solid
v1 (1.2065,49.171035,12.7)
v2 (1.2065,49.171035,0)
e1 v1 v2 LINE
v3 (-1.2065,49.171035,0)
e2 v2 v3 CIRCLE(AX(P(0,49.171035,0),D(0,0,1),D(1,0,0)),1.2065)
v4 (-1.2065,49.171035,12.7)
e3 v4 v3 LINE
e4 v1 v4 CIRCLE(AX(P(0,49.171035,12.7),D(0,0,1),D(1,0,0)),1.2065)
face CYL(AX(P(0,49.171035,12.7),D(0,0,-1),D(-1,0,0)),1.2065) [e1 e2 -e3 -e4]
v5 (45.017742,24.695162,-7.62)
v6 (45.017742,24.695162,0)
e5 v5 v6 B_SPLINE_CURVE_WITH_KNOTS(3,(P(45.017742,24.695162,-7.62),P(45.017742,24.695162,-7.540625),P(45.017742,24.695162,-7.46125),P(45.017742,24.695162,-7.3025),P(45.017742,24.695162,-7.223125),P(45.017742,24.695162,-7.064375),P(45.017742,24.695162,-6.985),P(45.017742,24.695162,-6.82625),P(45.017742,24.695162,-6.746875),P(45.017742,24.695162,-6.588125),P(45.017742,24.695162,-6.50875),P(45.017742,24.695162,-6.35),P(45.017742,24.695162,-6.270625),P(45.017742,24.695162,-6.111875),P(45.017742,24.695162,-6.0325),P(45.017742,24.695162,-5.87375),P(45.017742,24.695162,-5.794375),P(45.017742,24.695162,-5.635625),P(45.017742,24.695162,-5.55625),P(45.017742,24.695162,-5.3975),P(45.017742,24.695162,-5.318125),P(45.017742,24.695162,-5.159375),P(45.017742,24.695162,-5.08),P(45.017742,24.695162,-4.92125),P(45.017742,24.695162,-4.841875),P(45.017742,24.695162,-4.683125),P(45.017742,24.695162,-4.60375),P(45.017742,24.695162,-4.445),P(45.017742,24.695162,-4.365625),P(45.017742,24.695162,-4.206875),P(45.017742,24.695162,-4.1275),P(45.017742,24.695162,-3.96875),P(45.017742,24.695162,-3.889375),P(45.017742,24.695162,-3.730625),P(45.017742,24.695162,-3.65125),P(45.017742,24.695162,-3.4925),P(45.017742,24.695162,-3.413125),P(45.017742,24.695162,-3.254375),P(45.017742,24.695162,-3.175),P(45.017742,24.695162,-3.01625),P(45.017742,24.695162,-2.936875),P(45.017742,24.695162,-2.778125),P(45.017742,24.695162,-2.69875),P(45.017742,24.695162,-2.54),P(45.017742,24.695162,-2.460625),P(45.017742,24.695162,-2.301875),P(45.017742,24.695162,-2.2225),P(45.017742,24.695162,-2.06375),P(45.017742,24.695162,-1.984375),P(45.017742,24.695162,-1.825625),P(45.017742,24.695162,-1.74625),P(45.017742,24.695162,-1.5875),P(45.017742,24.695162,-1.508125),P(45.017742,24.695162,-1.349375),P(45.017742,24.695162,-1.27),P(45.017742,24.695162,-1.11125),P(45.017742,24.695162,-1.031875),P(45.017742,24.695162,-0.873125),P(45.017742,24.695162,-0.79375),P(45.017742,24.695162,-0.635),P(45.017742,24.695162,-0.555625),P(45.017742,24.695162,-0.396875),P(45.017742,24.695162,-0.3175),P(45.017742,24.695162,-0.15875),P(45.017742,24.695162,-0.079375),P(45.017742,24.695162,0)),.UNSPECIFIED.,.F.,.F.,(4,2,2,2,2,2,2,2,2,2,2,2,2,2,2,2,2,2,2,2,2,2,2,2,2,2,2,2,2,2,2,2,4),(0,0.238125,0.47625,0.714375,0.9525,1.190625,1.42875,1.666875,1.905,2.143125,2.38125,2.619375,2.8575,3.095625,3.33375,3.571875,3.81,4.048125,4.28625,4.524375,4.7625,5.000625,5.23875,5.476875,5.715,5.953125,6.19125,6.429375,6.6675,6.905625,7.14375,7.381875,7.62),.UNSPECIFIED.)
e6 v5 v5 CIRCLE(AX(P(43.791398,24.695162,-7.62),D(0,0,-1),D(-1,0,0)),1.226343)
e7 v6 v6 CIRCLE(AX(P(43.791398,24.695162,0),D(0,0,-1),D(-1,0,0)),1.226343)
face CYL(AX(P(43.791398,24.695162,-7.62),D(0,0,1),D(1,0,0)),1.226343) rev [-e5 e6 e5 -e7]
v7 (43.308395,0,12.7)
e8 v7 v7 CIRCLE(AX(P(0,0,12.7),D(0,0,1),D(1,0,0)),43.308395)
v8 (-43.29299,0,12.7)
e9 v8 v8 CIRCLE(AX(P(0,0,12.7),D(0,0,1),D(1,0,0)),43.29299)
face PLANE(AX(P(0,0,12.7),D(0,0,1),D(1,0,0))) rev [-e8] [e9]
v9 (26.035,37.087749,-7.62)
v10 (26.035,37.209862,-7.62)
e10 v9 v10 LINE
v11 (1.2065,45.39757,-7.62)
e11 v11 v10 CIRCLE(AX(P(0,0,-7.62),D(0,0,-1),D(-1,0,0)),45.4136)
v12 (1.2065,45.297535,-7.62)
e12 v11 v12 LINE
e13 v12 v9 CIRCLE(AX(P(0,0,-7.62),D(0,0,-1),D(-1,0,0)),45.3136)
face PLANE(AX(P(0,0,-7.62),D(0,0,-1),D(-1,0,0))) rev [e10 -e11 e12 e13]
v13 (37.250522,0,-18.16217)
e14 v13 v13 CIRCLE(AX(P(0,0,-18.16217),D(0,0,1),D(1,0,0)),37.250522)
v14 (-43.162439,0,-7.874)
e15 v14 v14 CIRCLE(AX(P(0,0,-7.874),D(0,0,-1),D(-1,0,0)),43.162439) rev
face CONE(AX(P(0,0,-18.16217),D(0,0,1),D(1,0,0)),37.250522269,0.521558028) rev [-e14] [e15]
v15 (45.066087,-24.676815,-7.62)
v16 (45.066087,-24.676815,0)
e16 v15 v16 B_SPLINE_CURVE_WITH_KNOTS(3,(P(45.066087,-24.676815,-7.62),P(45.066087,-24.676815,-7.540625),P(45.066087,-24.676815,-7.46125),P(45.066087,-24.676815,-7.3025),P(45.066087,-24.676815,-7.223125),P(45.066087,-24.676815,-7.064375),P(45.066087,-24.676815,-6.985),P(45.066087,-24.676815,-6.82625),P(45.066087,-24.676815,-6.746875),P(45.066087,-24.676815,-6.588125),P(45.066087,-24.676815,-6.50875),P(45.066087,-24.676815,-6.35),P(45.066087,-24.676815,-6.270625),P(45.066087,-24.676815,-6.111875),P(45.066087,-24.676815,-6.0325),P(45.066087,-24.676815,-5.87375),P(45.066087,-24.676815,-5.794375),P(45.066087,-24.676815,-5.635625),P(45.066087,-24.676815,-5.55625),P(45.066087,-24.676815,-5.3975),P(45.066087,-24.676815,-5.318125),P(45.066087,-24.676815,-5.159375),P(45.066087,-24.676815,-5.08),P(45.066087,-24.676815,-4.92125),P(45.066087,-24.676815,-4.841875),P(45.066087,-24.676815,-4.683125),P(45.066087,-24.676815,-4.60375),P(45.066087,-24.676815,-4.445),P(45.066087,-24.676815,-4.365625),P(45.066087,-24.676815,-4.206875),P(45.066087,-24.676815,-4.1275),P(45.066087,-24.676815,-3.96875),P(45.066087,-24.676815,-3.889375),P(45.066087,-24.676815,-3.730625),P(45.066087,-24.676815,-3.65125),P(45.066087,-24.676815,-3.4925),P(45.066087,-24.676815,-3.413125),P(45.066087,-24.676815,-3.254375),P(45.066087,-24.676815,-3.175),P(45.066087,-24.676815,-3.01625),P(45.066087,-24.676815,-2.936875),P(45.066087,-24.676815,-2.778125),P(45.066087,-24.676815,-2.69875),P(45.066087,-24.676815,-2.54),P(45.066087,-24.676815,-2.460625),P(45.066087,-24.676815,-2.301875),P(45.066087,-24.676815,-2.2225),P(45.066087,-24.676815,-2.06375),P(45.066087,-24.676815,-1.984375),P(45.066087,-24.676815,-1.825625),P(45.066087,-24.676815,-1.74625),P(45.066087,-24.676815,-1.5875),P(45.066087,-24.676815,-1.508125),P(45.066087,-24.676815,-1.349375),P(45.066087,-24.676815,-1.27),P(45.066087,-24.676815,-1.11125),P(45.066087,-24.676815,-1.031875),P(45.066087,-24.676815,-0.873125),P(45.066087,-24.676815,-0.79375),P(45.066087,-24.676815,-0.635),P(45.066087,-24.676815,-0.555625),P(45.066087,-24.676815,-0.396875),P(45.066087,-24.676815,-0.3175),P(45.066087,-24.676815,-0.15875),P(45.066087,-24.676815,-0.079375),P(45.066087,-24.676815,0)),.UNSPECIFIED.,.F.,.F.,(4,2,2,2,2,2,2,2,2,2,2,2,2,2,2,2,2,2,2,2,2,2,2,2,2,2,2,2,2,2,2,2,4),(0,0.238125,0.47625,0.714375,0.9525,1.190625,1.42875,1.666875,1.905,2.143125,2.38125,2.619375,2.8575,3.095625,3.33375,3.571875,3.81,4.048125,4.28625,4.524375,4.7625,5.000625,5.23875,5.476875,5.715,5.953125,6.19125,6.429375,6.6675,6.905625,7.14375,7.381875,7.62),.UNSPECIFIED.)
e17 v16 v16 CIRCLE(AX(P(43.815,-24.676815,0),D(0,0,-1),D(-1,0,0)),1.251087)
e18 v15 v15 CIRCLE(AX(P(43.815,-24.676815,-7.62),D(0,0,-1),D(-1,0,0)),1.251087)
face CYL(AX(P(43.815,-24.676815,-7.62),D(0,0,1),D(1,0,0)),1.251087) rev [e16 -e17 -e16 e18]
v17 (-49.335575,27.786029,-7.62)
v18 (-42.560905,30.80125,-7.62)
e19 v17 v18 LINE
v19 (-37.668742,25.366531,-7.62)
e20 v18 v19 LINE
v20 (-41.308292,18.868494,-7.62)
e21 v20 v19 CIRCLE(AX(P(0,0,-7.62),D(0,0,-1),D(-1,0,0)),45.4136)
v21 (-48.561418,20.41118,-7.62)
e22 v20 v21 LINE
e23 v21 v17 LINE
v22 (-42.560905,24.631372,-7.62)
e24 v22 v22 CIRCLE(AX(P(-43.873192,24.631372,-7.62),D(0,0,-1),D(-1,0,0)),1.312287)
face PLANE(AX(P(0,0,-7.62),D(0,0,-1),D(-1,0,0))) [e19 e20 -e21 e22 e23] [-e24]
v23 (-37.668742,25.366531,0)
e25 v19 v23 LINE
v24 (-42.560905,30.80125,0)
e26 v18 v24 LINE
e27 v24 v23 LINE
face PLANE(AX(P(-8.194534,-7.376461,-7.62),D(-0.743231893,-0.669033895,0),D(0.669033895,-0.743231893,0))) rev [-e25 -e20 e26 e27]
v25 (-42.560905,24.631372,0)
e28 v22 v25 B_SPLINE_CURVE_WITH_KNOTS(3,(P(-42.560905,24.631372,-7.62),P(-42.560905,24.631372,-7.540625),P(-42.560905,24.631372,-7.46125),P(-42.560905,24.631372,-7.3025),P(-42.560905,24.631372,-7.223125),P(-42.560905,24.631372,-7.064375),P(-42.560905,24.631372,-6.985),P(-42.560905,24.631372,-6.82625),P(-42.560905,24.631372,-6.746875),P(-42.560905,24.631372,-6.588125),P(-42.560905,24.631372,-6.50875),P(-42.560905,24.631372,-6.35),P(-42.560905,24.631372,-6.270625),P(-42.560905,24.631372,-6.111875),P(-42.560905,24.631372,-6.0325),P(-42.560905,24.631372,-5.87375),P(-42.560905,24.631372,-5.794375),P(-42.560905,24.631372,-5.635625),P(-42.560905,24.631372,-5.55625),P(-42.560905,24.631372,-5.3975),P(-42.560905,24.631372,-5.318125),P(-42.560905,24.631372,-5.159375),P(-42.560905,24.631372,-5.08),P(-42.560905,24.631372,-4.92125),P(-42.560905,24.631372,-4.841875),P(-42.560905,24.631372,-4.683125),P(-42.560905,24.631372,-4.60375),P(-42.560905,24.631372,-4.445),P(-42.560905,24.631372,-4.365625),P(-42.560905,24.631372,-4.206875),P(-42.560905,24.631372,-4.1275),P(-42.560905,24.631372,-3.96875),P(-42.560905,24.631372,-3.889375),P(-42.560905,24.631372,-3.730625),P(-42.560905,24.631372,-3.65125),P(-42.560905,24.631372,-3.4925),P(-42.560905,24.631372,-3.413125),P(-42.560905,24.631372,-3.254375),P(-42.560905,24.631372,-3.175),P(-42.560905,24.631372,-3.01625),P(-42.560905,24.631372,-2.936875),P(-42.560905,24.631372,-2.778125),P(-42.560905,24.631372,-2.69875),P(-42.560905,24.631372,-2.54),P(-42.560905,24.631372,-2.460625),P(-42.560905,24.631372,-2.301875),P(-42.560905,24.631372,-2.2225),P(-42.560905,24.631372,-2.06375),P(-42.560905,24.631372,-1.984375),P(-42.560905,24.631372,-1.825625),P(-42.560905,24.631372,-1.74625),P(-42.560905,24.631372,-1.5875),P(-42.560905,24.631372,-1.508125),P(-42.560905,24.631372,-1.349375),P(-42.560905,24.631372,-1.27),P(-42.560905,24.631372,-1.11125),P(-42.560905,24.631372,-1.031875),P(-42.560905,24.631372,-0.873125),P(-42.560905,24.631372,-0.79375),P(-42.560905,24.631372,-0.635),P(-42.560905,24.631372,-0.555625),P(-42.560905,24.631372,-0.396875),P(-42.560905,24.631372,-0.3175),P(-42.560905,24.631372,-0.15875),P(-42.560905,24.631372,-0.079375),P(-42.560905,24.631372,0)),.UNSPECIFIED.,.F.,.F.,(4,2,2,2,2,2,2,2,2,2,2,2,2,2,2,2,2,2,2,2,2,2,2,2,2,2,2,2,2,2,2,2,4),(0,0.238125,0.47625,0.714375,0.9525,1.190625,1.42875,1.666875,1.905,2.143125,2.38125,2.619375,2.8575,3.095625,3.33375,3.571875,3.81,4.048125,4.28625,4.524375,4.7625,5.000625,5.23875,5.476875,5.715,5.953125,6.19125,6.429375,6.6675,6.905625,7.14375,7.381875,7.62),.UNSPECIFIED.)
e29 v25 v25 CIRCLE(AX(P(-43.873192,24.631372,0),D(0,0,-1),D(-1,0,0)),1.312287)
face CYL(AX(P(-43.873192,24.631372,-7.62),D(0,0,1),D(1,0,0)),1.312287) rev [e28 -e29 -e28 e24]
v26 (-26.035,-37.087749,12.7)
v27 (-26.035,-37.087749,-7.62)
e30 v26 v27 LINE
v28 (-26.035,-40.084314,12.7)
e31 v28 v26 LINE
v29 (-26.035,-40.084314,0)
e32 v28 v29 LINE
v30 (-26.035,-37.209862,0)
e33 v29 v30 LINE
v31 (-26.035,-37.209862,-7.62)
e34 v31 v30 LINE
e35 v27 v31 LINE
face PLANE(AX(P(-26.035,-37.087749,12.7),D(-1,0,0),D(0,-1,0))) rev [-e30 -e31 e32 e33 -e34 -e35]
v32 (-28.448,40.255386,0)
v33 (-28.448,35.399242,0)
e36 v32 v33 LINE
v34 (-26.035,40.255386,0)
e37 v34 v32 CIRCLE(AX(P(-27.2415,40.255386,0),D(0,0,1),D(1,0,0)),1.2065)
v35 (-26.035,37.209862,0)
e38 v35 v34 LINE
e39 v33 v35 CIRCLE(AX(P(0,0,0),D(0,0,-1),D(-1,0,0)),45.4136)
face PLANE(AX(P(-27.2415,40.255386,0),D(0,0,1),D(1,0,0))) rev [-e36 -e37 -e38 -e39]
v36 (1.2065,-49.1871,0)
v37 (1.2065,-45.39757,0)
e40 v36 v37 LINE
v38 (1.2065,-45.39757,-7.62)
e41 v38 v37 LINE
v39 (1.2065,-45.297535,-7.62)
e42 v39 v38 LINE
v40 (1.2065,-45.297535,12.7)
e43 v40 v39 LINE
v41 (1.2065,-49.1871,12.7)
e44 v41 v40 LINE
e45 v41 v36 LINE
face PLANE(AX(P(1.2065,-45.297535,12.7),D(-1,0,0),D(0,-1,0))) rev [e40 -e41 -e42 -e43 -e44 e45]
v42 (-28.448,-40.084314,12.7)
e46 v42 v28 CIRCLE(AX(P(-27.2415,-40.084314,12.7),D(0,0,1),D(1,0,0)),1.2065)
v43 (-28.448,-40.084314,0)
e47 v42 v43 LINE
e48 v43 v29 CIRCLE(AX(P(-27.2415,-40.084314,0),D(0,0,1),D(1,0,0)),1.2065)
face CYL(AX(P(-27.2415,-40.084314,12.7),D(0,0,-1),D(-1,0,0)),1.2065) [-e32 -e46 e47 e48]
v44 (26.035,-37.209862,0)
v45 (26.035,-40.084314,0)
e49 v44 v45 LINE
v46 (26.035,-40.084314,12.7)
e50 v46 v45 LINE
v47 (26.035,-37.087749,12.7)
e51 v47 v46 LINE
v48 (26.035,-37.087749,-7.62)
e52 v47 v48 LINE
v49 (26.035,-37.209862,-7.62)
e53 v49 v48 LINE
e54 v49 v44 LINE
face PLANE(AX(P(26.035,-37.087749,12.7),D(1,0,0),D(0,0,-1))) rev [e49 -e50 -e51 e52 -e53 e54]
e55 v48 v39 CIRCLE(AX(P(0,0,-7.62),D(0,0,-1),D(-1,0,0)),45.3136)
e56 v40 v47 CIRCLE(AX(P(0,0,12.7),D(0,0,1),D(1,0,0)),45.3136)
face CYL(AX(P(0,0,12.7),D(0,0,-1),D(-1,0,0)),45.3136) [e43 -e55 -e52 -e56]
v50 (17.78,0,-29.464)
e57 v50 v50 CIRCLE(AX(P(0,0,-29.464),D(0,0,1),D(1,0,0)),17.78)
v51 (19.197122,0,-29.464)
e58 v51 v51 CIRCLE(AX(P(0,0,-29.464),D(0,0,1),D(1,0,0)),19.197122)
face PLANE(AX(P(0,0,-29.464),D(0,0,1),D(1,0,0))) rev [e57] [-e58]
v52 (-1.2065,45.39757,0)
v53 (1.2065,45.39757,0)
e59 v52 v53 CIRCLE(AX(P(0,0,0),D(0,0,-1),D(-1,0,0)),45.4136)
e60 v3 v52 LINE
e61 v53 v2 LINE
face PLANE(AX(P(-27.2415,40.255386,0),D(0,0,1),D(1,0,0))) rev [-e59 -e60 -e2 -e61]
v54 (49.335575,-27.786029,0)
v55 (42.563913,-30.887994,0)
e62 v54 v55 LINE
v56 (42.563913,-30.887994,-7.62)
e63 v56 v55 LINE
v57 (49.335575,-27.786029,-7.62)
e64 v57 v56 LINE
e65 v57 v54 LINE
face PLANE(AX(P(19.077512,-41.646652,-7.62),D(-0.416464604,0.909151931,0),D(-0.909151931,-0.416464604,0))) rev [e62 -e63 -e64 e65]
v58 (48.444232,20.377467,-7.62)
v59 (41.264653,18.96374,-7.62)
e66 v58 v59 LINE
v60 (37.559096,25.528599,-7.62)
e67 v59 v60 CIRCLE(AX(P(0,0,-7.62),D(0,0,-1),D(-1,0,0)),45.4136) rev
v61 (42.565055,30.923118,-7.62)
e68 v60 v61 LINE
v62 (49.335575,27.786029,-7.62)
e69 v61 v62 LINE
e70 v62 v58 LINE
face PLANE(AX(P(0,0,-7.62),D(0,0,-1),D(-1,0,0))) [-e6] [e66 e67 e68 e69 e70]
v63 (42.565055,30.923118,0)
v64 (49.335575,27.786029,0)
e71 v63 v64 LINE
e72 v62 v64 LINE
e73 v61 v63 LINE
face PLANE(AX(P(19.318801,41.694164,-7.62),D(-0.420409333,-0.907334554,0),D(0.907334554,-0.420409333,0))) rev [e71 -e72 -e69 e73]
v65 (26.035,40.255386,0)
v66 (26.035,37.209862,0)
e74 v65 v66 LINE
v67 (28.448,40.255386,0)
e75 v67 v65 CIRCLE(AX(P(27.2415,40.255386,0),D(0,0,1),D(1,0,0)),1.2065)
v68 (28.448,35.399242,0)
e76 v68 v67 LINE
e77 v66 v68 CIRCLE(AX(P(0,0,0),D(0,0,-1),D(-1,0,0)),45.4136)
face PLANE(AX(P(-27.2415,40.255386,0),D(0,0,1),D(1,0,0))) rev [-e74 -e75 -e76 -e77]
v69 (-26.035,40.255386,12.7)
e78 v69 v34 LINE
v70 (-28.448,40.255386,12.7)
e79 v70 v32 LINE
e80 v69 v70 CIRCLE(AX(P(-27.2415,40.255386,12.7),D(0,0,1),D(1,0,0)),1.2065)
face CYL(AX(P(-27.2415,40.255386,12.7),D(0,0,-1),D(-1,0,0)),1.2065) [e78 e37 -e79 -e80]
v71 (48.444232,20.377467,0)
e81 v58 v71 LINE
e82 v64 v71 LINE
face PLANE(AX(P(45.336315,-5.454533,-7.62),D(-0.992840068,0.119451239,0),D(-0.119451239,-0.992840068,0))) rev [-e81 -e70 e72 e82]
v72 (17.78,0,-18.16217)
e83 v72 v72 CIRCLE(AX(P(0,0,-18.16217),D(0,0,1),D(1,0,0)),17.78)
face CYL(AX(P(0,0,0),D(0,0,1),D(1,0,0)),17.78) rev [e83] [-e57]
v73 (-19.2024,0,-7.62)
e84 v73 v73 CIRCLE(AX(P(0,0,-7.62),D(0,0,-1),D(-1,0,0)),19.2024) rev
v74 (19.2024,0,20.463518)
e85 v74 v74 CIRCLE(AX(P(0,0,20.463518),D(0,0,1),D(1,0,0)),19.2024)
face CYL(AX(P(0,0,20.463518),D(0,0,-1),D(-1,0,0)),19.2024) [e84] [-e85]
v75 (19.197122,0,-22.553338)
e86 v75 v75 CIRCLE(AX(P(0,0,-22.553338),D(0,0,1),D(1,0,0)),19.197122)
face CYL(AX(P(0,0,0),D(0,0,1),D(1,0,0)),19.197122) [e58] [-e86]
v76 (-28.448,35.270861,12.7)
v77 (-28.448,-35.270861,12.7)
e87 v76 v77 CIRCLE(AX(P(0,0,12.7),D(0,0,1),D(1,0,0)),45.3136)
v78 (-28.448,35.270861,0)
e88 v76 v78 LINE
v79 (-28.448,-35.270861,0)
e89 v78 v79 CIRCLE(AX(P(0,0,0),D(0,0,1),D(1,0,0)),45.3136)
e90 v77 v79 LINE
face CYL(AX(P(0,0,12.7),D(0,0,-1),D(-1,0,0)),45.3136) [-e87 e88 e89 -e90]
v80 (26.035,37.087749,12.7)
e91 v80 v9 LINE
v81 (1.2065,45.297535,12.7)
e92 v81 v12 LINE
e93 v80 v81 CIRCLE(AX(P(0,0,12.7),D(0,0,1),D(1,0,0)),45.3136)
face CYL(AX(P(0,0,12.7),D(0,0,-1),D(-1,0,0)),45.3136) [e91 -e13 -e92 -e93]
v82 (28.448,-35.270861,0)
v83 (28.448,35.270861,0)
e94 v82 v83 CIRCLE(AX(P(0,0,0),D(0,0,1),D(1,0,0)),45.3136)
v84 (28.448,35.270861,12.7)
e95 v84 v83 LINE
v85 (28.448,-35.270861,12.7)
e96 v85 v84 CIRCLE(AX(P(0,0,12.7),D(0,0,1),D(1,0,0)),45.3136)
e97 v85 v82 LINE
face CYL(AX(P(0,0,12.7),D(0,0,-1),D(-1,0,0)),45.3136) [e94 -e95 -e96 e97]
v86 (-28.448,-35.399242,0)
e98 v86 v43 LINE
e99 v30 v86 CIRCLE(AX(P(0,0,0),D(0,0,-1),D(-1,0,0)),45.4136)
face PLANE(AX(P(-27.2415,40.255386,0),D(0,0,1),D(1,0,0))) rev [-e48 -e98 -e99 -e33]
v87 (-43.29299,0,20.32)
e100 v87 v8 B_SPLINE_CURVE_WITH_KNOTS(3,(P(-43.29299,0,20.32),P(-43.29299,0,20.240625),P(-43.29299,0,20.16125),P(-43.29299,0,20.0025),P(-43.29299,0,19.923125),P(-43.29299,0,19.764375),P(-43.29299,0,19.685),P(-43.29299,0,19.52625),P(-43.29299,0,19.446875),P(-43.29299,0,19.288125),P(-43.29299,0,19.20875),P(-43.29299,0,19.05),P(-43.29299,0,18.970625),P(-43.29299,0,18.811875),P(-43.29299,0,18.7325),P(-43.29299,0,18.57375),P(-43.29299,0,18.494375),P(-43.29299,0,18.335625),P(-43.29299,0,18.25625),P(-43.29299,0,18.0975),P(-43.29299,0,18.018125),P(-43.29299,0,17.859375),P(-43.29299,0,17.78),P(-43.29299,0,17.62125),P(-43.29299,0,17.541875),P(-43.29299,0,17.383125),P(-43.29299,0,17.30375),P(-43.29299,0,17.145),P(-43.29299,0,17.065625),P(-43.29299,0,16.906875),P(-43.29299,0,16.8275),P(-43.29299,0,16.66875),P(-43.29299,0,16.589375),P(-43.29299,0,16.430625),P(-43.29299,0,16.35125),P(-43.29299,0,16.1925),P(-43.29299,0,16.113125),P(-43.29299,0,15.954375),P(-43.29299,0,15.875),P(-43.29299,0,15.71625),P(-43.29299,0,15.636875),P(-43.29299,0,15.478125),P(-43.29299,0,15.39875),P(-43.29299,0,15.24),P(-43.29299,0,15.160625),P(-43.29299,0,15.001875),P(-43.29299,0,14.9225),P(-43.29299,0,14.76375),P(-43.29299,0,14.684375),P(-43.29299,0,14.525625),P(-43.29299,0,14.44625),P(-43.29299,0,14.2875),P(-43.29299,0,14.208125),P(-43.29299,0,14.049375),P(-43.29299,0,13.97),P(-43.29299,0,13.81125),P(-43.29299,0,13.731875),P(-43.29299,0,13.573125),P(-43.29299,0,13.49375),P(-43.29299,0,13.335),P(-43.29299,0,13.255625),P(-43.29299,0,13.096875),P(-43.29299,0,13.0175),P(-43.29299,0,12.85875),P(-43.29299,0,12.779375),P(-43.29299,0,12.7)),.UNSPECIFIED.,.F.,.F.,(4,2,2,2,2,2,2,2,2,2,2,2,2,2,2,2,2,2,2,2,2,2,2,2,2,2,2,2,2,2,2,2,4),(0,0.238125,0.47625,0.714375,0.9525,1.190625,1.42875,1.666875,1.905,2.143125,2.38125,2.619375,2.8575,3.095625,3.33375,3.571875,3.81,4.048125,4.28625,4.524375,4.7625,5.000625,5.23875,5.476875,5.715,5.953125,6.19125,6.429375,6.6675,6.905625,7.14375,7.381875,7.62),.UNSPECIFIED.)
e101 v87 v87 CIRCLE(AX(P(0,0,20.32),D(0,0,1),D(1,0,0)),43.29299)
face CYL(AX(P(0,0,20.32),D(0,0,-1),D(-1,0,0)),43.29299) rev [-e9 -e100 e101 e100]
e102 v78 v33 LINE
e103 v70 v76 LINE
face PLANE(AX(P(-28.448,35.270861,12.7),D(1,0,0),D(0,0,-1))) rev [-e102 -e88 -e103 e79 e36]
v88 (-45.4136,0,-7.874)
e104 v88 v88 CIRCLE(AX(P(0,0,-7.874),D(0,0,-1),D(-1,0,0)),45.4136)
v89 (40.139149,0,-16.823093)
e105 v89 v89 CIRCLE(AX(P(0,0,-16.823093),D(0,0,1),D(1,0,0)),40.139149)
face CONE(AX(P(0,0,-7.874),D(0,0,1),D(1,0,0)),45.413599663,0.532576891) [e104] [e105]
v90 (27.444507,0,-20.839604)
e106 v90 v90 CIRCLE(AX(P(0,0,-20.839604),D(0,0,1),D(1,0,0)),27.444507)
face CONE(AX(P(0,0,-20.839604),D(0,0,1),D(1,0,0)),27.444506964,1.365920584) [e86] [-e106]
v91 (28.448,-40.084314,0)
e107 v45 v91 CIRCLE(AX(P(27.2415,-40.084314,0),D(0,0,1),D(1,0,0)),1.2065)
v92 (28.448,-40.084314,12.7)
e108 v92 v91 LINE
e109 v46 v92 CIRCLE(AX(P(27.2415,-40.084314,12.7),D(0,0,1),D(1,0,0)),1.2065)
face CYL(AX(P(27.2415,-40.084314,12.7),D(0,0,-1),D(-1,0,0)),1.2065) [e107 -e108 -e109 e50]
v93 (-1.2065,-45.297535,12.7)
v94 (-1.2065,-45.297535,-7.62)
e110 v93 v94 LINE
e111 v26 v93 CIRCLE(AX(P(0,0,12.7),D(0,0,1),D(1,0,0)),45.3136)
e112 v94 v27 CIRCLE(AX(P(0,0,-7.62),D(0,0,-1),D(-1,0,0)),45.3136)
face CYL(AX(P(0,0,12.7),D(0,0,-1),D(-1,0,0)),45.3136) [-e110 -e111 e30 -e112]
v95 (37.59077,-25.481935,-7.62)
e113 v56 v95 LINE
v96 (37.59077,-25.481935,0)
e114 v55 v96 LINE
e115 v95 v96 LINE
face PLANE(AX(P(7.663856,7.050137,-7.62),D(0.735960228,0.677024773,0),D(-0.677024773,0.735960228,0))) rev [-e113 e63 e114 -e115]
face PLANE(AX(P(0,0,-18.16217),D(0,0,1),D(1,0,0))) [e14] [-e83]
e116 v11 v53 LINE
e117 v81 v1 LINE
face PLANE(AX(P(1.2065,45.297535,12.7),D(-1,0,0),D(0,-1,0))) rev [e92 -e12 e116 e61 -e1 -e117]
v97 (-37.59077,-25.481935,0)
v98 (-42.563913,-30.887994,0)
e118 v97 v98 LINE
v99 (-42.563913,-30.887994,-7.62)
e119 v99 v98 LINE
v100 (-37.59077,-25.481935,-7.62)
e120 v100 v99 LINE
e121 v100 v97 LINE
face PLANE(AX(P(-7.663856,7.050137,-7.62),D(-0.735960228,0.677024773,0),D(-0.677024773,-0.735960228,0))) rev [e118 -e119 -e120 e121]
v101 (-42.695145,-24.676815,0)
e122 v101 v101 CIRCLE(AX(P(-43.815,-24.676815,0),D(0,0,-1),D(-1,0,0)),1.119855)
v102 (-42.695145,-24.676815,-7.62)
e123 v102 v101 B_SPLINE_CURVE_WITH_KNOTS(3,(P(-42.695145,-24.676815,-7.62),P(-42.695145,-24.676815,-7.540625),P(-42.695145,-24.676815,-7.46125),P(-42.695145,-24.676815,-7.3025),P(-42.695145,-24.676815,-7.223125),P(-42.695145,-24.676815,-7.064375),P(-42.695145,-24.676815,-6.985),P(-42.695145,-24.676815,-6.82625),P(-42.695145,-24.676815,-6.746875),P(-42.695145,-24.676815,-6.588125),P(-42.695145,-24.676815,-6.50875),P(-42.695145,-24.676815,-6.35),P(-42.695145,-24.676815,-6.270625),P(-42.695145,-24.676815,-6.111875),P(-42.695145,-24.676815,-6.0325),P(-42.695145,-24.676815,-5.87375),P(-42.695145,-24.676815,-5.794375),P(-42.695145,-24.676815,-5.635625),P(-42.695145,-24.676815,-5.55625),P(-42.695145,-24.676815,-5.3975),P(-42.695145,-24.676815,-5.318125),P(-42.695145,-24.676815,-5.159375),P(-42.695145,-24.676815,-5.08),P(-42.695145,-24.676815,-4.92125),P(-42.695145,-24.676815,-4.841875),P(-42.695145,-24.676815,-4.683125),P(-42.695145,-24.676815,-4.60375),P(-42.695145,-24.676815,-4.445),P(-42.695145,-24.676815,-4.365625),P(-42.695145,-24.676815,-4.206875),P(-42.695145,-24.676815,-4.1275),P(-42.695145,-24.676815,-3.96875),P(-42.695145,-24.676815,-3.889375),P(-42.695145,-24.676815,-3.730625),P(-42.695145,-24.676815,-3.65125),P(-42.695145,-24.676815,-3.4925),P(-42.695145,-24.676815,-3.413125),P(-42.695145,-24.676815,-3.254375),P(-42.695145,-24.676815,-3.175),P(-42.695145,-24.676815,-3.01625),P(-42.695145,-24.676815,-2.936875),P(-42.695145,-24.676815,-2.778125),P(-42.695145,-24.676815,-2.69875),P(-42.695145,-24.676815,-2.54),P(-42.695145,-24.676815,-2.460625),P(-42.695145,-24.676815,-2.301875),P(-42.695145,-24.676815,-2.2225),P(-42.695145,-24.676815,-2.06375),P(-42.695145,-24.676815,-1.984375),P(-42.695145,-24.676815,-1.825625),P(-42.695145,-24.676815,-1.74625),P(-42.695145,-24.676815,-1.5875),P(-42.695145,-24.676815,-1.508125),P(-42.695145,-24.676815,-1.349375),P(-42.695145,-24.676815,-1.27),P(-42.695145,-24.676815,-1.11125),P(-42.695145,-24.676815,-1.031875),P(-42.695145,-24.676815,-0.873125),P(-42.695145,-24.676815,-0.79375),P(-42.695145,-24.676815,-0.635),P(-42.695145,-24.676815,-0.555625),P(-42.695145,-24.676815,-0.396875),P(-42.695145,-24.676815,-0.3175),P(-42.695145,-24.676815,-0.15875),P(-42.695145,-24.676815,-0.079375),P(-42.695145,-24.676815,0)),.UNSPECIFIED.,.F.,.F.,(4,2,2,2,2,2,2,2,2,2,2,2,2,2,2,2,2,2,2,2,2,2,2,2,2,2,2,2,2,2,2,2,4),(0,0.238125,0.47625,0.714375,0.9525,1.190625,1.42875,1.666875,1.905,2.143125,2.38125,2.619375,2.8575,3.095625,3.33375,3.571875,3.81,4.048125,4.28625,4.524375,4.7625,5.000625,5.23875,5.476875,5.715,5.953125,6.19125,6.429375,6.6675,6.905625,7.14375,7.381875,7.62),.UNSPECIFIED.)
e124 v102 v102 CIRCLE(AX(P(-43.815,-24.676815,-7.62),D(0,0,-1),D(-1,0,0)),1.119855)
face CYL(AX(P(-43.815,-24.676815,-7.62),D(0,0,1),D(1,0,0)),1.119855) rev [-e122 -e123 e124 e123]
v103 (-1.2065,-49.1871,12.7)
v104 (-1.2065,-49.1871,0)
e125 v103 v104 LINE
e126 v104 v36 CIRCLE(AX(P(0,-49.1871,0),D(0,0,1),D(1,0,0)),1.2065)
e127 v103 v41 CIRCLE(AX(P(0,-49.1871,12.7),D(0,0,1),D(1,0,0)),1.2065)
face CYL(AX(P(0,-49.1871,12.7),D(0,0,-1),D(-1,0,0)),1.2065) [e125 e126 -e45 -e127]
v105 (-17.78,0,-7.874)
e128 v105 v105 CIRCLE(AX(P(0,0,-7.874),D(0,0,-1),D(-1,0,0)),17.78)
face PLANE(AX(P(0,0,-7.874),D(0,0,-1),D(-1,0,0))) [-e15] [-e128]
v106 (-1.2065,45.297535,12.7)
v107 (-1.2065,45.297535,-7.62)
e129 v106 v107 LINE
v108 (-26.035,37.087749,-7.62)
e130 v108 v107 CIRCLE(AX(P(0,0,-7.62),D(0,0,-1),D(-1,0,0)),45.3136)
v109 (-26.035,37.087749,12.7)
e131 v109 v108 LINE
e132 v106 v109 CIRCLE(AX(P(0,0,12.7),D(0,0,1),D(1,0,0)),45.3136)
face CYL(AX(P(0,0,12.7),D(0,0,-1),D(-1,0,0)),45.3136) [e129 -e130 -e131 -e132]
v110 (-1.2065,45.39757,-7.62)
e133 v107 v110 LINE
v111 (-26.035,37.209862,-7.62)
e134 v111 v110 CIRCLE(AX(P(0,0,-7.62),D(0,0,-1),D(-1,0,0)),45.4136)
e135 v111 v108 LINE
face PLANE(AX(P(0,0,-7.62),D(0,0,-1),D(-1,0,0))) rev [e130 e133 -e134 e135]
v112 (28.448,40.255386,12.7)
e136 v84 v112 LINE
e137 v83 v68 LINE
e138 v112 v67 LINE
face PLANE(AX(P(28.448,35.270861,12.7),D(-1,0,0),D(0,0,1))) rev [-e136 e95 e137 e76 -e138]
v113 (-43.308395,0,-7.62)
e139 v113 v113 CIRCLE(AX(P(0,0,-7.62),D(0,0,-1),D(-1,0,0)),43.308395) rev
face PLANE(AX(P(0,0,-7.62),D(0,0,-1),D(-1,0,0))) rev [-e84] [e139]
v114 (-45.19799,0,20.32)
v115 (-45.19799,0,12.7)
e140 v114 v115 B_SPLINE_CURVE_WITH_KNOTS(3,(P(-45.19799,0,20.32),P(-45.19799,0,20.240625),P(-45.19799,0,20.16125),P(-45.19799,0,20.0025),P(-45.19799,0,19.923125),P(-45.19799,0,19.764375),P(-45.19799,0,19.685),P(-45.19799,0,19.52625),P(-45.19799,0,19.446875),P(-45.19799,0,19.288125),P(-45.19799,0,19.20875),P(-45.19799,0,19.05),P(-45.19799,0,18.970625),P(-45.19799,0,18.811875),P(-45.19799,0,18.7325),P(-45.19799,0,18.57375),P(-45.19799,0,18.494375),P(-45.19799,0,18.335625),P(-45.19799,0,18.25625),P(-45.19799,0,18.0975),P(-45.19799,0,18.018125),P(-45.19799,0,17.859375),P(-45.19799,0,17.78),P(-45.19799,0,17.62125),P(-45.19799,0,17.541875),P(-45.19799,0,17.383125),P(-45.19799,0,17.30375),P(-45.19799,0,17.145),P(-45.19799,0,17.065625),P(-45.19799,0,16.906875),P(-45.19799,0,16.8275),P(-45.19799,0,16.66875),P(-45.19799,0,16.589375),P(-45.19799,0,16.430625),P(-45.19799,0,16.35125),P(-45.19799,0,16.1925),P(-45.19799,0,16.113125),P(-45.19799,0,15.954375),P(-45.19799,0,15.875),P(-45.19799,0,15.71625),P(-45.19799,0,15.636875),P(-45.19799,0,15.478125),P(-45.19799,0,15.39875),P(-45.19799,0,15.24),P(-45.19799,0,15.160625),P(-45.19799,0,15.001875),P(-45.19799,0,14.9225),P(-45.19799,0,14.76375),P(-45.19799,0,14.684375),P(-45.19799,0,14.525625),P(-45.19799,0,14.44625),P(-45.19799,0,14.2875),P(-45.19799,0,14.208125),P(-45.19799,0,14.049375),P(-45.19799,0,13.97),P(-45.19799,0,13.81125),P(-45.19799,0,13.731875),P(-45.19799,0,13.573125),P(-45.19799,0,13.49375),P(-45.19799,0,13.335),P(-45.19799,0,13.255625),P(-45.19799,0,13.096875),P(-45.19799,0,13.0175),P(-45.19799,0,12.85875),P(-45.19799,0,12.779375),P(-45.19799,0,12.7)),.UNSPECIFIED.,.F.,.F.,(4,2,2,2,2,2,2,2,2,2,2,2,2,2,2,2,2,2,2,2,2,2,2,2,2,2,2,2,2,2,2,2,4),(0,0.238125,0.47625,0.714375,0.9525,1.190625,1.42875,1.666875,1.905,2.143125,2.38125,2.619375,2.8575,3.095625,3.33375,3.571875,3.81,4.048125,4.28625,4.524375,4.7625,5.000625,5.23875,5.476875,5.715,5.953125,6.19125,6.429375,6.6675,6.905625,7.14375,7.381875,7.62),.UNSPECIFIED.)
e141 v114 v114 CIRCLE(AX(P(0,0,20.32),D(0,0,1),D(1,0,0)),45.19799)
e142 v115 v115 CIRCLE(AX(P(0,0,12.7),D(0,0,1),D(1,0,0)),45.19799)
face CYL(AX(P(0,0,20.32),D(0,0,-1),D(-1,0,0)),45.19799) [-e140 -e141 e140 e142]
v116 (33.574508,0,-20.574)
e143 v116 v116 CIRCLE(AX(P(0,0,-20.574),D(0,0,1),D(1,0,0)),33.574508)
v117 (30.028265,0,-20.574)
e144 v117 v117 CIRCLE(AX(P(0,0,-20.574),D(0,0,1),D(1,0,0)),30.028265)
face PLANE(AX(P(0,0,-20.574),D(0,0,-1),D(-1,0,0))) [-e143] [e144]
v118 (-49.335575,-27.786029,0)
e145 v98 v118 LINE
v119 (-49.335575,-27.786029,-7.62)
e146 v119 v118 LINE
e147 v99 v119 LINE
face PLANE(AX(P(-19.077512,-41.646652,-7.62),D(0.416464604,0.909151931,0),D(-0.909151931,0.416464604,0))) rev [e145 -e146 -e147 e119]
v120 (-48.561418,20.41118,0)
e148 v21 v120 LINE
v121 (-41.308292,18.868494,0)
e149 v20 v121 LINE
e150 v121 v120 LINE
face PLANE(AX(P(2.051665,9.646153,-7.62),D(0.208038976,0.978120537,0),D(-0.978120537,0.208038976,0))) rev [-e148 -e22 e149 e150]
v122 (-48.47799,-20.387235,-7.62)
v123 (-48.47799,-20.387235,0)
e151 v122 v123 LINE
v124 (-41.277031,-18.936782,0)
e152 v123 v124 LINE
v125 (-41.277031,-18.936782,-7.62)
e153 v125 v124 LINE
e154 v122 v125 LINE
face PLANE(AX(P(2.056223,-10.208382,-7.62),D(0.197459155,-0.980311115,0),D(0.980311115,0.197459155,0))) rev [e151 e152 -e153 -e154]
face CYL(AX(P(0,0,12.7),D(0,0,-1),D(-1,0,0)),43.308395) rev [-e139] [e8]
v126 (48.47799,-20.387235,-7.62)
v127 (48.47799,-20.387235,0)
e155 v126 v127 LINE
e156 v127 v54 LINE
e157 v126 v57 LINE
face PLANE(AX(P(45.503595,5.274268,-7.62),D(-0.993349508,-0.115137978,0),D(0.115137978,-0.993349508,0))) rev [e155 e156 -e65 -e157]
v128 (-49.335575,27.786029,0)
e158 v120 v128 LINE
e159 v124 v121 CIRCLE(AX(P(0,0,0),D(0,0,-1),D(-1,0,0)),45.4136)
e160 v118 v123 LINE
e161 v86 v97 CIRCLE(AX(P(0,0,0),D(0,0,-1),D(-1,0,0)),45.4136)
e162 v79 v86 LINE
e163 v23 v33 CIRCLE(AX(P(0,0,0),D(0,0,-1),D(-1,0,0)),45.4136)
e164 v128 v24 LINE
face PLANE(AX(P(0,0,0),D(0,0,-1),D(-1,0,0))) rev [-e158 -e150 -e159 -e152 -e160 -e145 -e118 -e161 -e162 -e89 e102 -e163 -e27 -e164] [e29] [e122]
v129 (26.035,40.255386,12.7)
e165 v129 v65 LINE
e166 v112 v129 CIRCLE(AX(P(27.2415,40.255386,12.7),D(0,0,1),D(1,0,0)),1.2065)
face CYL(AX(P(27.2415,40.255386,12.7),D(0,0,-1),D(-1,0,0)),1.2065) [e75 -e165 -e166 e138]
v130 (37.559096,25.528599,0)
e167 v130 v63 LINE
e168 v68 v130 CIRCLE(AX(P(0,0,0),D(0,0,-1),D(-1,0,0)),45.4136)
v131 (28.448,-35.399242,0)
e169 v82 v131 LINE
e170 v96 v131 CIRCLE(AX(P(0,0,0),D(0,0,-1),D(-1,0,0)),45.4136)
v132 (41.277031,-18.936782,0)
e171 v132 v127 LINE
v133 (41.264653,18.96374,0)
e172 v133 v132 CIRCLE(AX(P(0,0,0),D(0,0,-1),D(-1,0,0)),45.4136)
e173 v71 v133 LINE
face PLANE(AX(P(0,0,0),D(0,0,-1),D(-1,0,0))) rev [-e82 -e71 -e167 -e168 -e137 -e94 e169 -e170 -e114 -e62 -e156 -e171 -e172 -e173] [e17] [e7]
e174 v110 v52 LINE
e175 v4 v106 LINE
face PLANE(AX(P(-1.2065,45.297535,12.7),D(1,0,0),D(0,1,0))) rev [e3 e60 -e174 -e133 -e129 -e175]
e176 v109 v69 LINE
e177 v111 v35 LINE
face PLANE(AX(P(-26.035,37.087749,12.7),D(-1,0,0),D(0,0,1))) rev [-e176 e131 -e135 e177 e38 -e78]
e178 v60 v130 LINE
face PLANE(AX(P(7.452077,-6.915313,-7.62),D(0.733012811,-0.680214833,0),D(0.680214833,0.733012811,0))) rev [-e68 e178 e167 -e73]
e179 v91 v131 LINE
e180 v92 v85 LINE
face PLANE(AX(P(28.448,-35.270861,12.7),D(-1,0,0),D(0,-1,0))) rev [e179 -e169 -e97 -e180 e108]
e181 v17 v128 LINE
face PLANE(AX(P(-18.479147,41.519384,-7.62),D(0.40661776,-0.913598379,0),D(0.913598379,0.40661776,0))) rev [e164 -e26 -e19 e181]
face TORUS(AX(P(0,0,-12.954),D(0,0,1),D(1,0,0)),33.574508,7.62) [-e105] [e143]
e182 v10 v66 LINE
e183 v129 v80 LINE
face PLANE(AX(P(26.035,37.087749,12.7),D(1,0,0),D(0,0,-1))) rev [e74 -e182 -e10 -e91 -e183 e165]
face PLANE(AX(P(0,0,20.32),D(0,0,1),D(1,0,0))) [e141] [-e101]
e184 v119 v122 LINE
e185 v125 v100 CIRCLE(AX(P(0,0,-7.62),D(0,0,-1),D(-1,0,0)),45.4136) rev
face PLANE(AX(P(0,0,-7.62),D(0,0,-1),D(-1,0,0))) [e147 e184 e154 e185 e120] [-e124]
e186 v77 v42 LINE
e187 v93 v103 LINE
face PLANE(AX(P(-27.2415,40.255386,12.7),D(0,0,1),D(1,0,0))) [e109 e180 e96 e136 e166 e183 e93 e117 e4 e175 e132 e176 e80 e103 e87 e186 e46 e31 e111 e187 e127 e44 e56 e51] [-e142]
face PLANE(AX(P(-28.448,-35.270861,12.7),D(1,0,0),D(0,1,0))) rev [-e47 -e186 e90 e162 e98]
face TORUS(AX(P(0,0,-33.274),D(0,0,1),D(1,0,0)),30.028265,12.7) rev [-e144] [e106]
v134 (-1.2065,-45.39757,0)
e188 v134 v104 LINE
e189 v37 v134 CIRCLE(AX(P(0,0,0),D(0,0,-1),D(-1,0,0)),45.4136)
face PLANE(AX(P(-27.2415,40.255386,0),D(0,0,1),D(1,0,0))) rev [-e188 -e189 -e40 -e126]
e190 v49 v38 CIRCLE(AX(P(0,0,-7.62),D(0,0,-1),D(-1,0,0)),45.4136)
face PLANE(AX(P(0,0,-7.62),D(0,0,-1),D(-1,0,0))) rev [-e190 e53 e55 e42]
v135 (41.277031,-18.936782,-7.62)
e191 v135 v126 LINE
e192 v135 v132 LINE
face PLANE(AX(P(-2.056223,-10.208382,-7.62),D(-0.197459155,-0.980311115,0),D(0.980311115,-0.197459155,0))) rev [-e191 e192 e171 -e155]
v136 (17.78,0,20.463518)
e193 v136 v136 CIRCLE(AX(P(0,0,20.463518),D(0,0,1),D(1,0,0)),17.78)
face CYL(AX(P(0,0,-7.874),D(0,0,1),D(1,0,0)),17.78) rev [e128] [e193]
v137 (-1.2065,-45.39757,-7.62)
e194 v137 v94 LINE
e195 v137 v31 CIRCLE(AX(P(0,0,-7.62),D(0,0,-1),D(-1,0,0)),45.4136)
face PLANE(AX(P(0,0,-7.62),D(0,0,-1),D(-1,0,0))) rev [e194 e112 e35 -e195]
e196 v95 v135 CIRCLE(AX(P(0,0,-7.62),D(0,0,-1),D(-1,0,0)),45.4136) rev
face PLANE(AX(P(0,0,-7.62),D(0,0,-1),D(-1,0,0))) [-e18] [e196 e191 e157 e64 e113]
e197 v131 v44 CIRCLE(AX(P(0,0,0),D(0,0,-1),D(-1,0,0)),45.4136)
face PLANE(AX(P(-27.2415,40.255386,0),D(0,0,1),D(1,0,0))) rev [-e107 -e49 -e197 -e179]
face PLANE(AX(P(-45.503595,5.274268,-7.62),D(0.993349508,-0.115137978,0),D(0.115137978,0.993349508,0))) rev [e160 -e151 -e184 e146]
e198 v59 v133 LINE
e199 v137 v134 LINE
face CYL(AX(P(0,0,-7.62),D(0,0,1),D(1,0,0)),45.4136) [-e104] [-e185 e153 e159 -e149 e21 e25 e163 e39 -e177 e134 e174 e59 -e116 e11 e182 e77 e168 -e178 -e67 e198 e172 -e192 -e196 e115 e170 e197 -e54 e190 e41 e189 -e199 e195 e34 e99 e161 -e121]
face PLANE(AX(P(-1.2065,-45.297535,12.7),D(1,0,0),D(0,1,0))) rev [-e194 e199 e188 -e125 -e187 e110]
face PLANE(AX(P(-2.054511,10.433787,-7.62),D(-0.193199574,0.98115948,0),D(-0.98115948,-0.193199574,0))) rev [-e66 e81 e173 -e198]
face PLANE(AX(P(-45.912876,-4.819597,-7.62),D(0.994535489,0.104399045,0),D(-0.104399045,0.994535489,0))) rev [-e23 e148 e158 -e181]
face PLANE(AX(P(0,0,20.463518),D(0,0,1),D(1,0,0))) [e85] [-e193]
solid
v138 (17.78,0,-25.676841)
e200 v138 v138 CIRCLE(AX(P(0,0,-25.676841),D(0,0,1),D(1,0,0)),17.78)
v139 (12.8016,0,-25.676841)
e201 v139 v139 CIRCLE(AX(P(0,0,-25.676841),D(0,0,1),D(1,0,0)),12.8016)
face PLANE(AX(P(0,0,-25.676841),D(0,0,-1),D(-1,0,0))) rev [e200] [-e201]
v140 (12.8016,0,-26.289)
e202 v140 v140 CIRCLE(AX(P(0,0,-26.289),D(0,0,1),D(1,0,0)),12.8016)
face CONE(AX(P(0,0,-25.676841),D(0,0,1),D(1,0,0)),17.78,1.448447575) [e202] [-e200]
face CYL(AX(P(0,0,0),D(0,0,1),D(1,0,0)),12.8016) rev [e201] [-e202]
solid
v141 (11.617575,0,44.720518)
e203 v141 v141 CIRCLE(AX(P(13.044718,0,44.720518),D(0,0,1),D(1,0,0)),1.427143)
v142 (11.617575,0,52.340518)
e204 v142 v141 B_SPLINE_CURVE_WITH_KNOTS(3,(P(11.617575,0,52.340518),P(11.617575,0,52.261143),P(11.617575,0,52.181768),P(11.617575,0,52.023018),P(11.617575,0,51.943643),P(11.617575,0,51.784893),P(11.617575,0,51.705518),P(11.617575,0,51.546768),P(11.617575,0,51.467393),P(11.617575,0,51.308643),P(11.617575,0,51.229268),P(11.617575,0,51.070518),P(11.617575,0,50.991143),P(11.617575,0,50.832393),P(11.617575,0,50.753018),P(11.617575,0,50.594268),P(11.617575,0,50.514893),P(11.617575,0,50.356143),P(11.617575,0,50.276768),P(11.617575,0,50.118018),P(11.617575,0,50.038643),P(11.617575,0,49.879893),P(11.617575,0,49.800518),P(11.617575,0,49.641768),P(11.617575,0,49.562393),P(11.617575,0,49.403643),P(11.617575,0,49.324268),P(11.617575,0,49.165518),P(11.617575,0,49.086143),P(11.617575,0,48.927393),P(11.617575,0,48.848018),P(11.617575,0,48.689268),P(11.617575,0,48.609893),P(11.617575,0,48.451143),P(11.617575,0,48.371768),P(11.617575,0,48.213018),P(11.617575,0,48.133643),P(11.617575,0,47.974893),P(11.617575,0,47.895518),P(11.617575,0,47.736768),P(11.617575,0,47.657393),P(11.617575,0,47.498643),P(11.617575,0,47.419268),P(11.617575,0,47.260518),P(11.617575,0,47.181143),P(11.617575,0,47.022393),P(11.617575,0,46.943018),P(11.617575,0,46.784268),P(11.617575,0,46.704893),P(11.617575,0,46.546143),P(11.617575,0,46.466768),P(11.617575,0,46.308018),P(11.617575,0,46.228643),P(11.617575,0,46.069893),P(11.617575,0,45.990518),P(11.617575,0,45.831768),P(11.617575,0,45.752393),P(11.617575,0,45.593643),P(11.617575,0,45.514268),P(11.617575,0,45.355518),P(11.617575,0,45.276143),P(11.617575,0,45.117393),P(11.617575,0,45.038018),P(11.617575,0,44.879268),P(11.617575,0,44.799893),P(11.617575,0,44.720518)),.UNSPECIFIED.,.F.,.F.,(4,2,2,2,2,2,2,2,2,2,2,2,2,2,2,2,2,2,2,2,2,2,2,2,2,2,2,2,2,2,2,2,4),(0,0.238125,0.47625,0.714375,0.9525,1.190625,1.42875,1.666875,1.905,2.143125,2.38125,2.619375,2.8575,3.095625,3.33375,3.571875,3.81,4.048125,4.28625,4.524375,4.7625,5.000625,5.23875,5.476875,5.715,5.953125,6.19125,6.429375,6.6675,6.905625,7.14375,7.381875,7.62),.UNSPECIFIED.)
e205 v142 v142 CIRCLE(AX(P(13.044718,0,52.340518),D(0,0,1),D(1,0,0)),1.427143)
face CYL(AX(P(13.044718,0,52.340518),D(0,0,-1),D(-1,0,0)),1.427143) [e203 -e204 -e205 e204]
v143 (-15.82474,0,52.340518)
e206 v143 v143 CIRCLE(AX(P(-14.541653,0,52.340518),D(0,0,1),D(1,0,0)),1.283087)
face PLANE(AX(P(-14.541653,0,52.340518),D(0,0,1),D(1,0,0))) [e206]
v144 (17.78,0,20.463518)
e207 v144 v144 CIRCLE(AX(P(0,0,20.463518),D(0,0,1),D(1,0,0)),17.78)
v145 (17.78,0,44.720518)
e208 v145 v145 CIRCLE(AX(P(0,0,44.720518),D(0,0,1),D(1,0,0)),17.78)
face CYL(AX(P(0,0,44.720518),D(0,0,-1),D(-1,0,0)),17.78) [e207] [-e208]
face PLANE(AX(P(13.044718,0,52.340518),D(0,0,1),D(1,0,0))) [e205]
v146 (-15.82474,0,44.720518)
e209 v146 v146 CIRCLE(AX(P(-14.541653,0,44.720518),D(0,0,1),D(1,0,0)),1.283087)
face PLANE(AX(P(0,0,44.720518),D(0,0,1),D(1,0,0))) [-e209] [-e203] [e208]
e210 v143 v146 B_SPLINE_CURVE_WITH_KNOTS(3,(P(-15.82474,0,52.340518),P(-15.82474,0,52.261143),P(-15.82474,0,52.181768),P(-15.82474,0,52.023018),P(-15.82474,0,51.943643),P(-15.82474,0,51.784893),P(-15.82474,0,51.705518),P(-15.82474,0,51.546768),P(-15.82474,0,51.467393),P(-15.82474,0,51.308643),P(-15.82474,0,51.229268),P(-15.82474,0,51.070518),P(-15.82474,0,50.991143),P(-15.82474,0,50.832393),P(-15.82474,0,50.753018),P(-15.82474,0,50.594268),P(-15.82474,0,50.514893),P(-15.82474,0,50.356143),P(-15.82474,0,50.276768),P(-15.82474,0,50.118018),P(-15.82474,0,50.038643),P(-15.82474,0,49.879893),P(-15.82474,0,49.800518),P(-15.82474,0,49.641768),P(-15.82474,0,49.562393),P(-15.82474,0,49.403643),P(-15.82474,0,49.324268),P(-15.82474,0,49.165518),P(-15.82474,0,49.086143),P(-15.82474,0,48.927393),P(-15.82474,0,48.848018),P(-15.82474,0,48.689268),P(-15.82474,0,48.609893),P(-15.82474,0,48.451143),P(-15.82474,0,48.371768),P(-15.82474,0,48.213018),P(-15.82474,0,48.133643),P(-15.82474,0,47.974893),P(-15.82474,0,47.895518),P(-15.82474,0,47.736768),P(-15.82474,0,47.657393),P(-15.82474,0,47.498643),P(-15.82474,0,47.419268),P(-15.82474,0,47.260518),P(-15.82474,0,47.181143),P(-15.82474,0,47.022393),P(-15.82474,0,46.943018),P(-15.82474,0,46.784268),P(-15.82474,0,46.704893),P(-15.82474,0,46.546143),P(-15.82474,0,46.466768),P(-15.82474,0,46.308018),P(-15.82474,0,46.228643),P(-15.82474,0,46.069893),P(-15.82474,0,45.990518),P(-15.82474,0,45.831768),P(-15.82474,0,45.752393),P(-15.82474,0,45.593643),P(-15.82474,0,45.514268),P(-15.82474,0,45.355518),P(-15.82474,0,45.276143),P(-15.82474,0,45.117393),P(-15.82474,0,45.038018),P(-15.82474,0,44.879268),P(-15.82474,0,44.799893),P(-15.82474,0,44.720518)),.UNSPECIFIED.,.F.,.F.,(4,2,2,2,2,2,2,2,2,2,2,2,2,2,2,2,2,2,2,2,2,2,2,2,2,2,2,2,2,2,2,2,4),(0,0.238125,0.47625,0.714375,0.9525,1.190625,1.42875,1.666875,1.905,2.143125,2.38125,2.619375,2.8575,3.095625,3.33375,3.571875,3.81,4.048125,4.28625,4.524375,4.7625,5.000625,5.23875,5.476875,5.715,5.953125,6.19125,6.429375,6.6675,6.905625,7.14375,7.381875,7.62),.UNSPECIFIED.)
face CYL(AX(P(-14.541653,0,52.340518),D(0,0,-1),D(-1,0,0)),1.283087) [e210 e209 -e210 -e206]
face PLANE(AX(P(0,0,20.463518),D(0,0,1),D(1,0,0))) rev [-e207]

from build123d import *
from build123d.topology import SkipClean

# Parameters (mm, degrees)
SKETCH3_R                 = 43.308395252
BOSS_EXTRUDE1_DEPTH       = 12.7
SKETCH4_R                 = 45.197989656
SKETCH4_R_2               = 43.292989656
BOSS_EXTRUDE2_DEPTH       = 7.62
BOSS_EXTRUDE3_OUTLINE_R   = 1.251086703
BOSS_EXTRUDE3_OUTLINE_R_2 = 1.119854884
BOSS_EXTRUDE3_OUTLINE_R_3 = 1.226343403
BOSS_EXTRUDE3_OUTLINE_R_4 = 43.308395252
BOSS_EXTRUDE3_OUTLINE_R_5 = 1.312287122
BOSS_EXTRUDE3_DEPTH       = 7.62
SKETCH8_R                 = 45.413599663
SKETCH8_R_2               = 17.78
BOSS_EXTRUDE4_DEPTH       = 0.254
BOSS_EXTRUDE5_START       = 28.08351791
SKETCH11_R                = 19.2024
SKETCH11_R_2              = 17.78
BOSS_EXTRUDE5_DEPTH       = 28.08351791
SKETCH14_R                = 17.78
BOSS_EXTRUDE6_DEPTH       = 24.257
SKETCH15_R                = 1.28308703
SKETCH15_R_2              = 1.42714276
BOSS_EXTRUDE7_DEPTH       = 7.62


# Read off the part's stored shape, not the designer's step: Boss-Extrude3
with BuildPart() as part:
    # Sketch3 → Boss-Extrude1 (new body)
    with BuildSketch(Plane.XY):
        with BuildLine():
            Line((-26.035, 37.08774892), (-26.035, 40.255386447))
            ThreePointArc((-26.035, 40.255386447), (-27.2415, 41.461886447), (-28.448, 40.255386447))
            Line((-28.448, 40.255386447), (-28.448, 35.270861075))
            ThreePointArc((-28.448, 35.270861075), (-45.3136, 0), (-28.448, -35.270861075))
            Line((-28.448, -35.270861075), (-28.448, -40.084313616))
            ThreePointArc((-28.448, -40.084313616), (-27.2415, -41.290813616), (-26.035, -40.084313616))
            Line((-26.035, -40.084313616), (-26.035, -37.08774892))
            ThreePointArc((-26.035, -37.08774892), (-14.225855988, -43.022637836), (-1.2065, -45.297535283))
            Line((-1.2065, -45.297535283), (-1.2065, -49.1871))
            ThreePointArc((-1.2065, -49.1871), (0, -50.3936), (1.2065, -49.1871))
            Line((1.2065, -49.1871), (1.2065, -45.297535283))
            ThreePointArc((1.2065, -45.297535283), (14.225855988, -43.022637836), (26.035, -37.08774892))
            Line((26.035, -37.08774892), (26.035, -40.084313616))
            ThreePointArc((26.035, -40.084313616), (27.2415, -41.290813616), (28.448, -40.084313616))
            Line((28.448, -40.084313616), (28.448, -35.270861075))
            ThreePointArc((28.448, -35.270861075), (45.3136, 0), (28.448, 35.270861075))
            Line((28.448, 35.270861075), (28.448, 40.255386447))
            ThreePointArc((28.448, 40.255386447), (27.2415, 41.461886447), (26.035, 40.255386447))
            Line((26.035, 40.255386447), (26.035, 37.08774892))
            ThreePointArc((26.035, 37.08774892), (14.225855988, 43.022637836), (1.2065, 45.297535283))
            Line((1.2065, 45.297535283), (1.2065, 49.171035283))
            ThreePointArc((1.2065, 49.171035283), (0, 50.377535283), (-1.2065, 49.171035283))
            Line((-1.2065, 49.171035283), (-1.2065, 45.297535283))
            ThreePointArc((-1.2065, 45.297535283), (-14.225855988, 43.022637836), (-26.035, 37.08774892))
        make_face()
        Circle(SKETCH3_R, mode=Mode.SUBTRACT)
    extrude(amount=BOSS_EXTRUDE1_DEPTH)

    # Sketch4 → Boss-Extrude2 (add)
    with BuildSketch(Plane.XY.offset(12.7)):
        with Locations(Location((0, 0, 0), (0, 0, 180))):
            Circle(SKETCH4_R)
        with Locations(Location((0, 0, 0), (0, 0, 180))):
            Circle(SKETCH4_R_2, mode=Mode.SUBTRACT)
    extrude(amount=BOSS_EXTRUDE2_DEPTH)

    # Boss-Extrude3 outline → Boss-Extrude3 (add)
    with BuildSketch(Plane(origin=(0, 0, 0), x_dir=(-1, 0, 0), z_dir=(0, 0, -1))):
        with BuildLine():
            Line((1.2065, -45.397570332), (1.2065, -45.297535283))
            ThreePointArc((1.2065, -45.297535283), (14.225855988, -43.022637836), (26.035, -37.08774892))
            Line((26.035, -37.08774892), (26.035, -37.209861721))
            ThreePointArc((26.035, -37.209861721), (32.348813344, -31.873959741), (37.590770255, -25.481935287))
            Line((37.590770255, -25.481935287), (42.563913297, -30.887993729))
            Line((42.563913297, -30.887993729), (49.335575426, -27.786028599))
            Line((49.335575426, -27.786028599), (48.477989954, -20.387235264))
            Line((48.477989954, -20.387235264), (41.277031293, -18.936782249))
            ThreePointArc((41.277031293, -18.936782249), (45.413584137, -0.037551817), (41.308291914, 18.868493674))
            Line((41.308291914, 18.868493674), (48.561417854, 20.411179708))
            Line((48.561417854, 20.411179708), (49.335575426, 27.786028599))
            Line((49.335575426, 27.786028599), (42.560905178, 30.801249841))
            Line((42.560905178, 30.801249841), (37.668742456, 25.366530628))
            ThreePointArc((37.668742456, 25.366530628), (32.397651513, 31.824317915), (26.035, 37.209861721))
            Line((26.035, 37.209861721), (26.035, 37.08774892))
            ThreePointArc((26.035, 37.08774892), (14.225855988, 43.022637836), (1.2065, 45.297535283))
            Line((1.2065, 45.297535283), (1.2065, 45.397570332))
            ThreePointArc((1.2065, 45.397570332), (0, 45.413599663), (-1.2065, 45.397570332))
            Line((-1.2065, 45.397570332), (-1.2065, 45.297535283))
            ThreePointArc((-1.2065, 45.297535283), (-14.225855988, 43.022637836), (-26.035, 37.08774892))
            Line((-26.035, 37.08774892), (-26.035, 37.209861721))
            ThreePointArc((-26.035, 37.209861721), (-32.32901523, 31.89404033), (-37.55909567, 25.528598997))
            Line((-37.55909567, 25.528598997), (-42.565054803, 30.923118495))
            Line((-42.565054803, 30.923118495), (-49.335575426, 27.786028599))
            Line((-49.335575426, 27.786028599), (-48.444231571, 20.377466752))
            Line((-48.444231571, 20.377466752), (-41.264653189, 18.963739915))
            ThreePointArc((-41.264653189, 18.963739915), (-45.413597241, 0.014831834), (-41.277031293, -18.936782249))
            Line((-41.277031293, -18.936782249), (-48.477989954, -20.387235264))
            Line((-48.477989954, -20.387235264), (-49.335575426, -27.786028599))
            Line((-49.335575426, -27.786028599), (-42.563913297, -30.887993729))
            Line((-42.563913297, -30.887993729), (-37.590770255, -25.481935287))
            ThreePointArc((-37.590770255, -25.481935287), (-32.348813344, -31.873959741), (-26.035, -37.209861721))
            Line((-26.035, -37.209861721), (-26.035, -37.08774892))
            ThreePointArc((-26.035, -37.08774892), (-14.225855988, -43.022637836), (-1.2065, -45.297535283))
            Line((-1.2065, -45.297535283), (-1.2065, -45.397570332))
            ThreePointArc((-1.2065, -45.397570332), (0, -45.413599663), (1.2065, -45.397570332))
        make_face()
        with Locations((-43.815, -24.676814501)):
            Circle(BOSS_EXTRUDE3_OUTLINE_R, mode=Mode.SUBTRACT)
        with Locations((43.815, -24.676814501)):
            Circle(BOSS_EXTRUDE3_OUTLINE_R_2, mode=Mode.SUBTRACT)
        with Locations((-43.791398207, 24.695162459)):
            Circle(BOSS_EXTRUDE3_OUTLINE_R_3, mode=Mode.SUBTRACT)
        Circle(BOSS_EXTRUDE3_OUTLINE_R_4, mode=Mode.SUBTRACT)
        with Locations((43.8731923, 24.631372396)):
            Circle(BOSS_EXTRUDE3_OUTLINE_R_5, mode=Mode.SUBTRACT)
    extrude(amount=BOSS_EXTRUDE3_DEPTH)

    # Sketch8 → Boss-Extrude4 (add)
    with BuildSketch(Plane(origin=(0, 0, -7.62), x_dir=(-1, 0, 0), z_dir=(0, 0, -1))):
        with Locations(Location((0, 0, 0), (0, 0, 204.644373174))):
            Circle(SKETCH8_R)
        Circle(SKETCH8_R_2, mode=Mode.SUBTRACT)
    extrude(amount=BOSS_EXTRUDE4_DEPTH)

    # Sketch11 → Boss-Extrude5 (add)
    with SkipClean():  # the faces are left unmerged after this step: merging them gives an invalid solid
        with BuildSketch(Plane.XY.offset(-7.62).offset(BOSS_EXTRUDE5_START)):
            with Locations(Location((0, 0, 0), (0, 0, 180))):
                Circle(SKETCH11_R)
            Circle(SKETCH11_R_2, mode=Mode.SUBTRACT)
        extrude(amount=-BOSS_EXTRUDE5_DEPTH)

    # Sketch13 → Revolve2 (revolve)
    with SkipClean():  # the faces are left unmerged after this step: merging them gives an invalid solid
        with BuildSketch(Plane(origin=(0, 0, 0), x_dir=(1, 0, 0), z_dir=(0, 1, 0)), mode=Mode.PRIVATE) as revolve2_sk:
            Polygon((-12.8016, 26.289), (-17.78, 25.67684141), (-12.8016, 25.67684141), align=None)
            with BuildLine():
                Line((-40.139149173, 16.823093253), (-45.413599663, 7.874))
                Line((-45.413599663, 7.874), (-43.162438604, 7.874))
                Line((-43.162438604, 7.874), (-37.250522269, 18.162169636))
                Line((-37.250522269, 18.162169636), (-17.78, 18.162169636))
                Line((-17.78, 18.162169636), (-17.78, 20.574))
                Line((-17.78, 20.574), (-17.78, 23.114))
                Line((-17.78, 23.114), (-17.78, 25.67684141))
                Line((-17.78, 25.67684141), (-17.78, 29.464))
                Line((-17.78, 29.464), (-19.197121901, 29.464))
                Line((-19.197121901, 29.464), (-19.197121901, 22.553338322))
                Line((-19.197121901, 22.553338322), (-27.444506964, 20.839604351))
                ThreePointArc((-27.444506964, 20.839604351), (-28.729577969, 20.640575588), (-30.028264855, 20.574))
                Line((-30.028264855, 20.574), (-33.574507721, 20.574))
                ThreePointArc((-33.574507721, 20.574), (-37.35484563, 19.570150338), (-40.139149173, 16.823093253))
            make_face()
        revolve(revolve2_sk.sketch.rotate(Axis((0, 0, 0), (0, 0, -1)), 180), axis=Axis((0, 0, 0), (0, 0, -1)))
    add(part.part.scale(1), mode=Mode.REPLACE)  # the faces are merged on a copy


with BuildPart() as revolve2_piece_1:
    # of the separate pieces the step leaves, piece 1, a body of its own (revolve2_pieces)
    add(part.part.solids().sort_by_distance((-26.035, -40.084313616, 0))[0])


with BuildPart() as revolve2_piece_2:
    # of the separate pieces the step leaves, piece 2, a body of its own (revolve2_pieces)
    add(part.part.solids().sort_by_distance((12.8016, 0, -26.289))[0])


with BuildPart() as body_3:
    # Sketch14 → Boss-Extrude6 (new body)
    with BuildSketch(Plane.XY.offset(20.46351791)):
        Circle(SKETCH14_R)
    extrude(amount=BOSS_EXTRUDE6_DEPTH)

    # Sketch15 → Boss-Extrude7 (add)
    with BuildSketch(Plane.XY.offset(44.72051791)):
        with Locations(Location((-14.541653004, 0, 0), (0, 0, 180))):
            Circle(SKETCH15_R)
        with Locations(Location((13.044718136, 0, 0), (0, 0, 180))):
            Circle(SKETCH15_R_2)
    extrude(amount=BOSS_EXTRUDE7_DEPTH)


solid = Compound([revolve2_piece_1.part, revolve2_piece_2.part, body_3.part])
